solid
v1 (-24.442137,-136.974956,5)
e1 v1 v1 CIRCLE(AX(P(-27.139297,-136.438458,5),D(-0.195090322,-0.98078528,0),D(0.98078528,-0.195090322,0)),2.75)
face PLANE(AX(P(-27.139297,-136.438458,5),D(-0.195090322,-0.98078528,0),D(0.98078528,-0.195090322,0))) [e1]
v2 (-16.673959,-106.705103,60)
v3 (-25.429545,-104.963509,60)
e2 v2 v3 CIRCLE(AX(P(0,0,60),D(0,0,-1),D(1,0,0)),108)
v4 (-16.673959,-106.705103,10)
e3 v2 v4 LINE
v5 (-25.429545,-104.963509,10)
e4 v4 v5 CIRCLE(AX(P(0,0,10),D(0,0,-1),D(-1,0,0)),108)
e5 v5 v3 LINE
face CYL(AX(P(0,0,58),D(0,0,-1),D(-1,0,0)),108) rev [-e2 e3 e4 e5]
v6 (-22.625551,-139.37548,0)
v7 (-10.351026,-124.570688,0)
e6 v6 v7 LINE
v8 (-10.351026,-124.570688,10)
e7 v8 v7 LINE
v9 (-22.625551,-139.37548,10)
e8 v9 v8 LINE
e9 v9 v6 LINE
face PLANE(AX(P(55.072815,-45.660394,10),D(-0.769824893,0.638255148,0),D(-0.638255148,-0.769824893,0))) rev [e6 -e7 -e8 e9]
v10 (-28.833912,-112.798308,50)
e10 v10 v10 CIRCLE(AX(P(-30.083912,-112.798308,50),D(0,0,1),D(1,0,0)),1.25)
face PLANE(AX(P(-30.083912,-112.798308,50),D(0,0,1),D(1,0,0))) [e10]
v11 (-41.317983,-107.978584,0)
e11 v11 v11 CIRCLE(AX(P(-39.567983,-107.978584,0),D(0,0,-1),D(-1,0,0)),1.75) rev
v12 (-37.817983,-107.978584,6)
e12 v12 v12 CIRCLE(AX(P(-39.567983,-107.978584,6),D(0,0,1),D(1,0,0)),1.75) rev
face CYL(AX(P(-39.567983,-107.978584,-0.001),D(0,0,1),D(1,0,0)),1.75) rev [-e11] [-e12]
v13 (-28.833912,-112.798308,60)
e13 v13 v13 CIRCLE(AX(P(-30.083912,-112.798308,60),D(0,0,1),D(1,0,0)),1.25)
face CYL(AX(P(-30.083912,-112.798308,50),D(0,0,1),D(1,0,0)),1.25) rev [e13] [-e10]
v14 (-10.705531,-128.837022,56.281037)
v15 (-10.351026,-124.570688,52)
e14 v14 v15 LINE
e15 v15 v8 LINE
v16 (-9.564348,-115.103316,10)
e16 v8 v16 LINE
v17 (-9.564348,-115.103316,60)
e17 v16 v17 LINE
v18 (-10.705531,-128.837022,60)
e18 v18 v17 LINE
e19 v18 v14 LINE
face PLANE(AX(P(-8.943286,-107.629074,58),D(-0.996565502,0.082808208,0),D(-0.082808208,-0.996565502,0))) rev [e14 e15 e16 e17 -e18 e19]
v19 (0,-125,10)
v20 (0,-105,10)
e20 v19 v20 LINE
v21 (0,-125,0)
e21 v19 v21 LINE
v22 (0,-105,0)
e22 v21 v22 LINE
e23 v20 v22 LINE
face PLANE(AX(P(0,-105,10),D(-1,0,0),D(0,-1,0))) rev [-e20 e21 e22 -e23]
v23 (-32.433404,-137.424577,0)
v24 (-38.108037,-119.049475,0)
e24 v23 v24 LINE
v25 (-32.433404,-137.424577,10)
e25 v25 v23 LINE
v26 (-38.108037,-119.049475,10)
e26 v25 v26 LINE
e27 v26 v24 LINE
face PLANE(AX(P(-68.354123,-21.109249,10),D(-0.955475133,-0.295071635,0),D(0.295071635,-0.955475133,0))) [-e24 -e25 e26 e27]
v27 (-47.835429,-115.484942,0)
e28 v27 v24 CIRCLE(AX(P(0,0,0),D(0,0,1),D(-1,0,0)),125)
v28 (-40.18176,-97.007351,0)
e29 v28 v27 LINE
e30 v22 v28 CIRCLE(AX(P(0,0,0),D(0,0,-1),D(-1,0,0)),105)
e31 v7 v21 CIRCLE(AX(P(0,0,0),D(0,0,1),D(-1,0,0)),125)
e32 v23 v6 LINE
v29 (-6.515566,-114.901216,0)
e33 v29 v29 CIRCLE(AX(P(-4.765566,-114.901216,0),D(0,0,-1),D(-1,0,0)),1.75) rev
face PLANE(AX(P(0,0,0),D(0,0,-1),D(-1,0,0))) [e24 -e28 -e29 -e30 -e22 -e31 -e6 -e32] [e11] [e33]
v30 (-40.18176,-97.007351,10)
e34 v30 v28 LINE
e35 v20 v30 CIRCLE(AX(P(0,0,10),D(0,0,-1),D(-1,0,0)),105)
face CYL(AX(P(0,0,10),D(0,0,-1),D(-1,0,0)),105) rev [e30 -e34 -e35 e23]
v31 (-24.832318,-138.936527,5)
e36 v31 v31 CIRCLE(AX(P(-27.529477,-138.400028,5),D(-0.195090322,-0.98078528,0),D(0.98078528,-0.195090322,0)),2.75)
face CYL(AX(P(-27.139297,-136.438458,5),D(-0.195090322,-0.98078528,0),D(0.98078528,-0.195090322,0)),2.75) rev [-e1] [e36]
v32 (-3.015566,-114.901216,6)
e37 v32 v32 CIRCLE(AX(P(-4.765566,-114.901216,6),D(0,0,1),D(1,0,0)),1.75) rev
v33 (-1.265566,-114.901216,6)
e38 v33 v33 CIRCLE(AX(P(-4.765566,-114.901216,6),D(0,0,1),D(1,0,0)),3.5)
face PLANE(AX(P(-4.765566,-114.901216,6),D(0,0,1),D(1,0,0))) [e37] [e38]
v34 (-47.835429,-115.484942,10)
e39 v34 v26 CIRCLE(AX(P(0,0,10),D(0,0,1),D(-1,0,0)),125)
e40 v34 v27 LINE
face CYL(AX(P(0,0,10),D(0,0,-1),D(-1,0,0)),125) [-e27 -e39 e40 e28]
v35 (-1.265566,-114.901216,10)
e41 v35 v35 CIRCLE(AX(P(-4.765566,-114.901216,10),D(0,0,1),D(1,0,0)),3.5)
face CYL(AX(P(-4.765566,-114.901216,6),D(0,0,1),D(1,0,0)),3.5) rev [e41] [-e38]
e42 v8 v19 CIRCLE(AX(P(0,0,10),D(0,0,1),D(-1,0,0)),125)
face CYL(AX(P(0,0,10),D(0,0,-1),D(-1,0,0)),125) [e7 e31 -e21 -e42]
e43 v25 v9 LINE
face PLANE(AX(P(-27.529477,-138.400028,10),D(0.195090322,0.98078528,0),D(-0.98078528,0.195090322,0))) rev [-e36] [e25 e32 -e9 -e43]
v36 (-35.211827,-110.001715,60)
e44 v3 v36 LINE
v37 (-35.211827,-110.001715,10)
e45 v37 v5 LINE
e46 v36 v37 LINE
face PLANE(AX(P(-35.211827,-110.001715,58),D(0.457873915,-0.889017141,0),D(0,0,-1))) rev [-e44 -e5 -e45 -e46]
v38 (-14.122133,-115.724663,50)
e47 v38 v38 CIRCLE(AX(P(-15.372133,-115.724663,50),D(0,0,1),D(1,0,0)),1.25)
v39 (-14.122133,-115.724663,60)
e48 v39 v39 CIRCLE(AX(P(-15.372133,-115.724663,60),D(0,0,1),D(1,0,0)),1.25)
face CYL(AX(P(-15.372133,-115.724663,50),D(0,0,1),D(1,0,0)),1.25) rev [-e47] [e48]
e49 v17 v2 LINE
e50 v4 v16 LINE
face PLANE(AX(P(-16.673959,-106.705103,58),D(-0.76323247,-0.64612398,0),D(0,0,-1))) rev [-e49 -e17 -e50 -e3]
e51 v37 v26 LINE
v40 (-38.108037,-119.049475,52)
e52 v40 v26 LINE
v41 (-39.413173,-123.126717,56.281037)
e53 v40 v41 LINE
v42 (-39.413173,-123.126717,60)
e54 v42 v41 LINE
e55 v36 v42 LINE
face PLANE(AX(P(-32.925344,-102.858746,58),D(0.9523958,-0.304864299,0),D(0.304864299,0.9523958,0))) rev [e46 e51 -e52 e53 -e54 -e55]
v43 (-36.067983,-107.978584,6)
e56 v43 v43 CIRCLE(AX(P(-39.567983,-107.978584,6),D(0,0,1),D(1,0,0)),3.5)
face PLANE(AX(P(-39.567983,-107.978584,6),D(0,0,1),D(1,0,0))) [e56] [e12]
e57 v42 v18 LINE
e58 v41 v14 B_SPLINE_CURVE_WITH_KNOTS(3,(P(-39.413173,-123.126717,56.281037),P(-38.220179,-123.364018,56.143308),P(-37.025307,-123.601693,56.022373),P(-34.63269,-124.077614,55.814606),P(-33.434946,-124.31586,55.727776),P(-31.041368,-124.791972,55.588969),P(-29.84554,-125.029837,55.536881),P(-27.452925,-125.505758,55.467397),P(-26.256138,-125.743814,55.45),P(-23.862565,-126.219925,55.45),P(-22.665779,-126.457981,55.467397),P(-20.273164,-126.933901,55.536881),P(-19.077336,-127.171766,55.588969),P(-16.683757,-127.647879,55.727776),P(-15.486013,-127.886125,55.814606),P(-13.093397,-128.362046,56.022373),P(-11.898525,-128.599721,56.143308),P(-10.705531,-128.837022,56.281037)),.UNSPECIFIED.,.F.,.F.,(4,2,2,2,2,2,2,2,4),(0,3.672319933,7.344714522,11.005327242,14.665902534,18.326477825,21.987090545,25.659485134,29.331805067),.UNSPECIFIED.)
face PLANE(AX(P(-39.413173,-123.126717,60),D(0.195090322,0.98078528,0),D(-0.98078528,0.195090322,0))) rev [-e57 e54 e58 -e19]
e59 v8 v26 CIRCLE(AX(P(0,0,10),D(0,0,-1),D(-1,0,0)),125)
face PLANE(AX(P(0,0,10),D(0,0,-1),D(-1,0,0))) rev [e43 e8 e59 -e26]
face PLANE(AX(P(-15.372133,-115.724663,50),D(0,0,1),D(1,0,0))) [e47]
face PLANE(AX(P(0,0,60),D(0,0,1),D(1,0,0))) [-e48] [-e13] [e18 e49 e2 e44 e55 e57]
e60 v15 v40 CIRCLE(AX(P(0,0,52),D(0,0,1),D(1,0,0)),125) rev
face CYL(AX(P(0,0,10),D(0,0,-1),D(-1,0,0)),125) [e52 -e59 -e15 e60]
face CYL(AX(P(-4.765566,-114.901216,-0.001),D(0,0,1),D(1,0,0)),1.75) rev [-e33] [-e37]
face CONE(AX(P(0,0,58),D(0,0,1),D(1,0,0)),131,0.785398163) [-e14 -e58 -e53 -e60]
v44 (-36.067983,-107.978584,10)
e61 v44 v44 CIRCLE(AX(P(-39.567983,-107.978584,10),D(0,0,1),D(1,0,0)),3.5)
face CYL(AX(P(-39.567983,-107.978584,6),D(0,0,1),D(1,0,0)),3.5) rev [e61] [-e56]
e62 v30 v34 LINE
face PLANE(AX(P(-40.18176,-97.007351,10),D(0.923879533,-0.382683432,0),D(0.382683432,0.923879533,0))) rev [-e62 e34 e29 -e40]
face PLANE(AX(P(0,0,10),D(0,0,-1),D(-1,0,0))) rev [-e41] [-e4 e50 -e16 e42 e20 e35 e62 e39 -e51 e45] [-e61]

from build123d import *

# Parameters (mm, degrees)
BOSS_EXTRU_1_DEPTH      = 10
BOSS_EXTRU_2_DEPTH      = 48
BOSS_EXTRU_3_DEPTH      = 2
CHANFREIN1_SIZE         = 6
ENL_V_MAT_EXTRU_1_REACH = 148.244
ESQUISSE5_R             = 1.75
ESQUISSE6_R             = 3.5
ENL_V_MAT_EXTRU_2_DEPTH = 4
CHANFREIN2_SIZE         = 7.5
ESQUISSE7_R             = 1.25
ENL_V_MAT_EXTRU_3_DEPTH = 10
BOSS_EXTRU_4_DEPTH      = 10
ESQUISSE9_R             = 2.75
ENL_V_MAT_EXTRU_4_DEPTH = 2


with BuildPart() as part:
    # Esquisse1 → Boss.-Extru.1 (new body)
    with BuildSketch(Plane.XY):
        with BuildLine():
            Line((-40.181760398, -97.007350914), (-47.835429046, -115.484941564))
            ThreePointArc((-47.835429046, -115.484941564), (-24.386290252, -122.59816005), (0, -125))
            Line((0, -125), (0, -105))
            ThreePointArc((0, -105), (-20.484483812, -102.982454442), (-40.181760398, -97.007350914))
        make_face()
    extrude(amount=BOSS_EXTRU_1_DEPTH)

    # Esquisse2 → Boss.-Extru.2 (add)
    with BuildSketch(Plane.XY.offset(10)):
        with BuildLine():
            Line((-32.925344295, -102.858746361), (-38.108037379, -119.049474955))
            ThreePointArc((-38.108037379, -119.049474955), (-24.386290252, -122.59816005), (-10.351025939, -124.570687812))
            Line((-10.351025939, -124.570687812), (-8.943286411, -107.62907427))
            ThreePointArc((-8.943286411, -107.62907427), (-21.069754778, -105.924810284), (-32.925344295, -102.858746361))
        make_face()
    extrude(amount=BOSS_EXTRU_2_DEPTH)

    # Esquisse4 → Boss.-Extru.3 (add)
    with BuildSketch(Plane.XY.offset(58)):
        with BuildLine():
            Line((-39.413172773, -123.12671677), (-10.705530953, -128.837021766))
            Line((-10.705530953, -128.837021766), (-8.943286411, -107.62907427))
            ThreePointArc((-8.943286411, -107.62907427), (-21.069754778, -105.924810284), (-32.925344295, -102.858746361))
            Line((-32.925344295, -102.858746361), (-39.413172773, -123.12671677))
        make_face()
    extrude(amount=BOSS_EXTRU_3_DEPTH)

    # Chanfrein1
    # the kernel refuses this chamfer: 6 mm, written as the material it adds along each edge
    with BuildSketch(Plane(origin=(0, 0, 58), x_dir=(-0.3048642990280114, -0.9523957996432781, 0), z_dir=(-0.9523957996432781, 0.3048642990280114, 0))) as chanfrein1_piece_1_section:
        Polygon((125 + CHANFREIN1_SIZE, 0), (125, -CHANFREIN1_SIZE), (125, 0), align=None)
    chanfrein1_piece_1 = revolve(axis=Axis((0, 0, 58), (0, 0, 1)), revolution_arc=13, mode=Mode.PRIVATE)
    chanfrein1_piece_1 = split(chanfrein1_piece_1, bisect_by=Plane(origin=(-25.059351863, -125.981869268, 58), z_dir=(0.19509032201612828, 0.9807852804032304, 0)), keep=Keep.TOP, mode=Mode.PRIVATE)
    add(chanfrein1_piece_1)

    # Esquisse5 → Enlèv. mat.-Extru.1 (cut, up to next)
    with BuildSketch(Plane.XY.offset(10), mode=Mode.PRIVATE) as enl_v_mat_extru_1_sk1:
        with Locations((-4.765565521, -114.901215769)):
            Circle(ESQUISSE5_R)
    enl_v_mat_extru_1_tool1 = extrude(enl_v_mat_extru_1_sk1.sketch, amount=-ENL_V_MAT_EXTRU_1_REACH, mode=Mode.PRIVATE) & part.part
    # Esquisse5 → Enlèv. mat.-Extru.1 (cut, up to next)
    with BuildSketch(Plane.XY.offset(10), mode=Mode.PRIVATE) as enl_v_mat_extru_1_sk2:
        with Locations((-39.567983188, -107.978584481)):
            Circle(ESQUISSE5_R)
    enl_v_mat_extru_1_tool2 = extrude(enl_v_mat_extru_1_sk2.sketch, amount=-ENL_V_MAT_EXTRU_1_REACH, mode=Mode.PRIVATE) & part.part
    add(enl_v_mat_extru_1_tool1.solids().sort_by_distance((-4.765566, -114.901216, 10))[0], mode=Mode.SUBTRACT)
    add(enl_v_mat_extru_1_tool2.solids().sort_by_distance((-39.567983, -107.978584, 10))[0], mode=Mode.SUBTRACT)

    # Esquisse6 → Enlèv. mat.-Extru.2 (cut)
    with BuildSketch(Plane.XY.offset(10)):
        with Locations((-39.567983188, -107.978584481)):
            Circle(ESQUISSE6_R)
        with Locations((-4.765565521, -114.901215769)):
            Circle(ESQUISSE6_R)
    extrude(amount=-ENL_V_MAT_EXTRU_2_DEPTH, mode=Mode.SUBTRACT)

    # Chanfrein2
    # the kernel refuses this chamfer: 7.5 mm, written as the material it takes off along each edge
    with BuildSketch(Plane(origin=(-8.943286411, -107.62907427, 10), x_dir=(-0.08280820751335238, -0.996565502497666, 0), z_dir=(0, 0, 1)), Plane(origin=(-32.925344295, -102.858746361, 80.019854797), x_dir=(-0.3048642990290983, -0.9523957996429303, 0), z_dir=(0, 0, -1))) as chanfrein2_piece_1:
        with BuildLine():
            Line((CHANFREIN2_SIZE, 0), (-0.280634385, -7.780634385))
            ThreePointArc((-0.280634385, -7.780634385), (-0.074202159, -4.002769088), (0, 0))
            Line((0, 0), (CHANFREIN2_SIZE, 0))
        make_face()
    extrude(amount=70.019854797, mode=Mode.SUBTRACT)

    # Esquisse7 → Enlèv. mat.-Extru.3 (cut)
    with BuildSketch(Plane.XY.offset(60)):
        with Locations((-30.083912118, -112.798307752)):
            Circle(ESQUISSE7_R)
        with Locations((-15.372132912, -115.724662582)):
            Circle(ESQUISSE7_R)
    extrude(amount=-ENL_V_MAT_EXTRU_3_DEPTH, mode=Mode.SUBTRACT)

    # Esquisse8 → Boss.-Extru.4 (add)
    with BuildSketch(Plane(origin=(0, 0, 0), x_dir=(-1, 0, 0), z_dir=(0, 0, -1))):
        with BuildLine():
            Line((22.625550905, -139.375480075), (32.433403709, -137.424576855))
            Line((32.433403709, -137.424576855), (38.108037379, -119.049474955))
            ThreePointArc((38.108037379, -119.049474955), (24.386290252, -122.59816005), (10.351025939, -124.570687812))
            Line((10.351025939, -124.570687812), (22.625550905, -139.375480075))
        make_face()
    extrude(amount=-BOSS_EXTRU_4_DEPTH)

    # Esquisse9 → Enlèv. mat.-Extru.4 (cut)
    with BuildSketch(Plane(origin=(-27.529477307, -138.400028465, 0), x_dir=(0.9807852804032304, -0.19509032201612822, 0), z_dir=(-0.19509032201612822, -0.9807852804032304, 0))):
        with Locations((0, 5)):
            Circle(ESQUISSE9_R)
    extrude(amount=-ENL_V_MAT_EXTRU_4_DEPTH, mode=Mode.SUBTRACT)


solid = part.part
